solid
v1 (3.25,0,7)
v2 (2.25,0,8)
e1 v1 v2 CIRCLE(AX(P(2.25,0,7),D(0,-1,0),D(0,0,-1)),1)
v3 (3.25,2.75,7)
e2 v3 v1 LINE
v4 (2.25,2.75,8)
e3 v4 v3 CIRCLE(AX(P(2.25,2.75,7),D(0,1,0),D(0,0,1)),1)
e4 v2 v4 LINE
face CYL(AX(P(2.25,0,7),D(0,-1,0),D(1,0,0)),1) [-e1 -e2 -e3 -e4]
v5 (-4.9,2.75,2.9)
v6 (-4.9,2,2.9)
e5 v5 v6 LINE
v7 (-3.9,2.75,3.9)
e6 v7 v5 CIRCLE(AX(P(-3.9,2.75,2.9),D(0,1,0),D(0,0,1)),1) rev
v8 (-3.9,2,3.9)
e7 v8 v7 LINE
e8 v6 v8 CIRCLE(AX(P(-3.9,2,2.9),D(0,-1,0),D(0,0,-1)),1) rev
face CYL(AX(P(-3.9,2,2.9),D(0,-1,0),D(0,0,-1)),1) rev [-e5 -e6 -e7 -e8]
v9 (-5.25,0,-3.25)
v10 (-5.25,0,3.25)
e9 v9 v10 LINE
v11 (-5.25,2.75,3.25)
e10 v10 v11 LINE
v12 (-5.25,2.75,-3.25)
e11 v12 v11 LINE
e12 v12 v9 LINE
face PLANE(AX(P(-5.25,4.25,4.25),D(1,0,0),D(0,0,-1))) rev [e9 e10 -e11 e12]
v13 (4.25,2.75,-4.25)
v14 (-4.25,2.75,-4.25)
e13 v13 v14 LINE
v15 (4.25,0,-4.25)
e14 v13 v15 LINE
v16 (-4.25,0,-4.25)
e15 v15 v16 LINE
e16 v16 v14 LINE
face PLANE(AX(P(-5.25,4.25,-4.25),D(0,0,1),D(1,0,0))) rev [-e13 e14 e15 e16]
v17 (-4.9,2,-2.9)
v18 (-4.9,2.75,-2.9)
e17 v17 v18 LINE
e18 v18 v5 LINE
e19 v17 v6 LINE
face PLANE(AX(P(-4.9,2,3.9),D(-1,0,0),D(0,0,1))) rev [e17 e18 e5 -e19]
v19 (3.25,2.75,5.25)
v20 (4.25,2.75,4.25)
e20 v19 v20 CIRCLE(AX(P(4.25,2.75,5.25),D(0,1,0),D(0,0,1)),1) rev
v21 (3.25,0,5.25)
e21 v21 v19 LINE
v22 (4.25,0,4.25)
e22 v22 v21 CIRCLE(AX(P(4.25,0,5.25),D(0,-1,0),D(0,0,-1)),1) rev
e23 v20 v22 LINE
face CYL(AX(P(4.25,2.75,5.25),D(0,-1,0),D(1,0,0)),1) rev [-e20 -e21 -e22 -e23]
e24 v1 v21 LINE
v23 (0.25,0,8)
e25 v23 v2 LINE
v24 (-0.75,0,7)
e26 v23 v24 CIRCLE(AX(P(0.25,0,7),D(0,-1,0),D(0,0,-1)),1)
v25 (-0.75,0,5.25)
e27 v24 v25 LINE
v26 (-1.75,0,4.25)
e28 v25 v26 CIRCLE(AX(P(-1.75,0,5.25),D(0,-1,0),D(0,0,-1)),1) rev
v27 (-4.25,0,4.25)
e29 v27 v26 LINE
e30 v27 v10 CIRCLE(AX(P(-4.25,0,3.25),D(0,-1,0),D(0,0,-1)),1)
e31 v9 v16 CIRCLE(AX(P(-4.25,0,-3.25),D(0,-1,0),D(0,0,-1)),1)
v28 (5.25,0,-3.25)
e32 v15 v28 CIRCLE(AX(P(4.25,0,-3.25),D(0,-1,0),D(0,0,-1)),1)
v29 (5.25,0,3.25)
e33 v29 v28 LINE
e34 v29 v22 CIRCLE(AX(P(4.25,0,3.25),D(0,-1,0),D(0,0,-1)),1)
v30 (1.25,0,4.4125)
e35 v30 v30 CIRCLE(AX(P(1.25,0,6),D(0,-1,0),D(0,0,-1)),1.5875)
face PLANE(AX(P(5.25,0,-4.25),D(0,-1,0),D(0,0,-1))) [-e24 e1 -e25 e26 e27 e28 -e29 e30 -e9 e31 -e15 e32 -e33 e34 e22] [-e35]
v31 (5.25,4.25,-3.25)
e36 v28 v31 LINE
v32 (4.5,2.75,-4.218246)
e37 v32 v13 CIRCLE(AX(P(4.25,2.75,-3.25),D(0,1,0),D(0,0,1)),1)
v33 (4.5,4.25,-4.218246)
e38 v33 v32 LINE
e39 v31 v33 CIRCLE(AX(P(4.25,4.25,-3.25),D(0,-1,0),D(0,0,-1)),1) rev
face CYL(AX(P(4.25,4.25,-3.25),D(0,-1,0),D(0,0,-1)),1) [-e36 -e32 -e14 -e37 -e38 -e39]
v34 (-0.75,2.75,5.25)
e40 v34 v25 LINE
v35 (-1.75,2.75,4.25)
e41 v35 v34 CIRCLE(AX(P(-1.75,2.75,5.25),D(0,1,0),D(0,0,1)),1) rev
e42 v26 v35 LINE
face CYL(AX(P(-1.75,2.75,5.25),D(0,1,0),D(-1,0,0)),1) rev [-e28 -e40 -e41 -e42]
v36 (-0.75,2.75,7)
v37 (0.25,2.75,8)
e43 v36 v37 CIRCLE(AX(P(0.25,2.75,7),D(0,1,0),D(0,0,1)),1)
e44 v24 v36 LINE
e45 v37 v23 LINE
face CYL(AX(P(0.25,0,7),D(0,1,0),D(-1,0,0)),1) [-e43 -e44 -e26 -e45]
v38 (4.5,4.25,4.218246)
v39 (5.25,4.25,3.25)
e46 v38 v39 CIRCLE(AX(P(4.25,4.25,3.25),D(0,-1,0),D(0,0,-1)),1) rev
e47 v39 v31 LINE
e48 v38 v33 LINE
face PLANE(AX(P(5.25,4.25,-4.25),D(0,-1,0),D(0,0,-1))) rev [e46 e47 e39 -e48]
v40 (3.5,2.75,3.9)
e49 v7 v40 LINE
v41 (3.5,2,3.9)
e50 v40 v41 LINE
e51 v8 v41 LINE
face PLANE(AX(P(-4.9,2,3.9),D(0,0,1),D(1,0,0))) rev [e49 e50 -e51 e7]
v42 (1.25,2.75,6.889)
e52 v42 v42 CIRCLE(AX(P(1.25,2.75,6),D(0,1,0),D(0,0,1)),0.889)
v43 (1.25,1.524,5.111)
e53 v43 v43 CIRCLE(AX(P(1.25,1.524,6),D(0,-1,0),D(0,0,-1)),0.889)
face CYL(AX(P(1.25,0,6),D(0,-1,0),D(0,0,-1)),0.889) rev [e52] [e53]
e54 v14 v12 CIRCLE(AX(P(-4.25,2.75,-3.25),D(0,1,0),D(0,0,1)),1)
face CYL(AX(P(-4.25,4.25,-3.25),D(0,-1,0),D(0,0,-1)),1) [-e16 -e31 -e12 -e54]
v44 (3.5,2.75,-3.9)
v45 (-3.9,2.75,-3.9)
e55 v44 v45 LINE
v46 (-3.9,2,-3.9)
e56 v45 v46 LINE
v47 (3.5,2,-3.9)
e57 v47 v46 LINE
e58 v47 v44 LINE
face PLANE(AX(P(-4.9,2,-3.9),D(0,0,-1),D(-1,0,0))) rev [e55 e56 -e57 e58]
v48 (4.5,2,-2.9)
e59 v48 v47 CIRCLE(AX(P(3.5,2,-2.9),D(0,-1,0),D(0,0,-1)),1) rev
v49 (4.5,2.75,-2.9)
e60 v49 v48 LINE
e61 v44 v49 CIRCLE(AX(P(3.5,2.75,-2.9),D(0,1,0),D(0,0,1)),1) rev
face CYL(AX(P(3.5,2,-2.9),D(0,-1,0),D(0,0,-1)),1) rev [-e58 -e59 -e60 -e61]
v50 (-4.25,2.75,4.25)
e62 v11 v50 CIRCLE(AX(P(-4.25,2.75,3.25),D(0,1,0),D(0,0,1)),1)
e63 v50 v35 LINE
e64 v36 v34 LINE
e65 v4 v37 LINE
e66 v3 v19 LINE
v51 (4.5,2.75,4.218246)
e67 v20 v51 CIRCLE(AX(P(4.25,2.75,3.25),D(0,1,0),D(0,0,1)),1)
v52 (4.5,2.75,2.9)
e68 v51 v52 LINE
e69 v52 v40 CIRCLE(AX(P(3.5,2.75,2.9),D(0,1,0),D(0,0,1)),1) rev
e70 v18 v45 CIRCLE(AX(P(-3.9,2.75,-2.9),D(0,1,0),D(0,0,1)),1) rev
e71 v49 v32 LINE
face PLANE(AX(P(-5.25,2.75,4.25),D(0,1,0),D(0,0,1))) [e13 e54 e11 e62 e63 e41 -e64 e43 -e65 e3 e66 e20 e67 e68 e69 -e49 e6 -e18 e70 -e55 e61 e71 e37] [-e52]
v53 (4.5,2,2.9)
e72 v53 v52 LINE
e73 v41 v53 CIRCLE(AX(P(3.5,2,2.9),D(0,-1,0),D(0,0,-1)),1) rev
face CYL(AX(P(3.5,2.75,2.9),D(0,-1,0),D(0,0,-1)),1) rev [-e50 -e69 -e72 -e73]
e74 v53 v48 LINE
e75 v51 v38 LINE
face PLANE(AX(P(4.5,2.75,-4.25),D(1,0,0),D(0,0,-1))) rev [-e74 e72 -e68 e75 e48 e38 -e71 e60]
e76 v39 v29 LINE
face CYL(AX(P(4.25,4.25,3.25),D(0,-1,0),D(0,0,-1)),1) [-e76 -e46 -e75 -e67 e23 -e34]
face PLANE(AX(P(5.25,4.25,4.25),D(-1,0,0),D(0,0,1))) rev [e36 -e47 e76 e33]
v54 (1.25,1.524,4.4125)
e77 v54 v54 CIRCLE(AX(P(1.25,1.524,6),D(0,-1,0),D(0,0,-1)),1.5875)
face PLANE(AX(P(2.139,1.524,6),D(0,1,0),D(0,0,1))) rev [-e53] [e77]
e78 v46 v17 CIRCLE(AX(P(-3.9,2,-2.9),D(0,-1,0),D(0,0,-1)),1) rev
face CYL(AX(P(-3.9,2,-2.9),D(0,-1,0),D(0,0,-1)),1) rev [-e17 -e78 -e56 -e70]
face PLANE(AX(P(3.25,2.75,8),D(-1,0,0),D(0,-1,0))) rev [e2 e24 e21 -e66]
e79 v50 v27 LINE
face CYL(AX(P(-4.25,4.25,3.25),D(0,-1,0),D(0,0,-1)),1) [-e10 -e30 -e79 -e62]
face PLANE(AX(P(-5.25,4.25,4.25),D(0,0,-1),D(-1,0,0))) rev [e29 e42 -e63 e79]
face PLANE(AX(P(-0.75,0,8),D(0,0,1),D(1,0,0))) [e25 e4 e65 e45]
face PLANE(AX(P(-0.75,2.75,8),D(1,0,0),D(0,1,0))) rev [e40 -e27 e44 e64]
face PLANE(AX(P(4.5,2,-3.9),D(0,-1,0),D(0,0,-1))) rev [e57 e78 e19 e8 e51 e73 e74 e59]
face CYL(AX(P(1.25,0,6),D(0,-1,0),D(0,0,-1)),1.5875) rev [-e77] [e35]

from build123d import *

# Parameters (mm, degrees)
SKETCH1_W                                      = 10.5
SKETCH1_H                                      = 8.5
EXTRUDE1_DEPTH                                 = 4.25
SKETCH3_W                                      = 9.75
SKETCH3_H                                      = 8.5
EXTRUDE4_DEPTH                                 = 1.5
SKETCH4_W                                      = 9.4
SKETCH4_H                                      = 7.8
EXTRUDE5_DEPTH                                 = 0.75
SKETCH5_W                                      = 4
SKETCH5_H                                      = 2.75
EXTRUDE6_DEPTH                                 = 3.75
CBORE_FOR_0_SOCKET_HEAD_CAP_SCREW1_D           = 1.778
CBORE_FOR_0_SOCKET_HEAD_CAP_SCREW1_CBORE_D     = 3.175
CBORE_FOR_0_SOCKET_HEAD_CAP_SCREW1_CBORE_DEPTH = 1.524
FILLET1_R                                      = 1


with BuildPart() as part:
    # Sketch1 → Extrude1 (new body)
    with BuildSketch(Plane(origin=(0, 0, 0), x_dir=(1, 0, 0), z_dir=(0, 1, 0))):
        Rectangle(SKETCH1_W, SKETCH1_H)
    extrude(amount=EXTRUDE1_DEPTH)

    # Sketch3 → Extrude4 (cut)
    with BuildSketch(Plane(origin=(0, 4.25, 0), x_dir=(1, 0, 0), z_dir=(0, 1, 0))):
        with Locations((-0.375, 0)):
            Rectangle(SKETCH3_W, SKETCH3_H)
    extrude(amount=-EXTRUDE4_DEPTH, mode=Mode.SUBTRACT)

    # Sketch4 → Extrude5 (cut)
    with BuildSketch(Plane(origin=(0, 2.75, 0), x_dir=(1, 0, 0), z_dir=(0, 1, 0))):
        with Locations((-0.2, 0)):
            Rectangle(SKETCH4_W, SKETCH4_H)
    extrude(amount=-EXTRUDE5_DEPTH, mode=Mode.SUBTRACT)

    # Sketch5 → Extrude6 (add)
    with BuildSketch(Plane.XY.offset(4.25)):
        with Locations((1.25, 1.375)):
            Rectangle(SKETCH5_W, SKETCH5_H)
    extrude(amount=EXTRUDE6_DEPTH)

    # CBORE for #0 Socket Head Cap Screw1 (through all)
    with Locations(Plane(origin=(1.25, 0, 6), x_dir=(0, 0, -1), z_dir=(0, -1, 0))):
        with Locations((0, 0)):
            CounterBoreHole(CBORE_FOR_0_SOCKET_HEAD_CAP_SCREW1_D / 2, CBORE_FOR_0_SOCKET_HEAD_CAP_SCREW1_CBORE_D / 2, CBORE_FOR_0_SOCKET_HEAD_CAP_SCREW1_CBORE_DEPTH)

    # Fillet1
    # the kernel refuses this fillet: 1 mm, written as the material it adds along each edge
    with BuildSketch(Plane(origin=(3.25, 2.75, 4.25), x_dir=(0, 0, 1), z_dir=(0, -1, 0))) as fillet1_piece_1:
        with BuildLine():
            CenterArc((FILLET1_R, -FILLET1_R), FILLET1_R, 90, 90)
            Line((0, -FILLET1_R), (0, 0))
            Line((0, 0), (FILLET1_R, 0))
        make_face()
    extrude(amount=2.75)
    with BuildSketch(Plane(origin=(-0.75, 0, 4.25), x_dir=(-1, 0, 0), z_dir=(0, 1, 0))) as fillet1_piece_2:
        with BuildLine():
            CenterArc((FILLET1_R, FILLET1_R), FILLET1_R, 180, 90)
            Line((0, FILLET1_R), (0, 0))
            Line((0, 0), (FILLET1_R, 0))
        make_face()
    extrude(amount=2.75)
    with BuildSketch(Plane(origin=(4.5, 2.75, -3.9), x_dir=(0, 0, 1), z_dir=(0, -1, 0)), Plane(origin=(-4.9, 2.75, -3.9), x_dir=(1, 0, 0), z_dir=(0, -1, 0)), Plane(origin=(-4.9, 2.75, 3.9), x_dir=(0, 0, -1), z_dir=(0, -1, 0))) as fillet1_piece_3:
        with BuildLine():
            CenterArc((FILLET1_R, FILLET1_R), FILLET1_R, 180, 90)
            Line((0, FILLET1_R), (0, 0))
            Line((0, 0), (FILLET1_R, 0))
        make_face()
    extrude(amount=0.75)
    with BuildSketch(Plane(origin=(4.5, 2.75, 3.9), x_dir=(0, 0, -1), z_dir=(0, -1, 0))) as fillet1_piece_4:
        with BuildLine():
            CenterArc((FILLET1_R, -FILLET1_R), FILLET1_R, 90, 90)
            Line((0, -FILLET1_R), (0, 0))
            Line((0, 0), (FILLET1_R, 0))
        make_face()
    extrude(amount=0.75)
    # the kernel refuses this fillet: 1 mm, written as the material it takes off along each edge
    with BuildSketch(Plane(origin=(5.25, -2.5, -4.25), x_dir=(-1, 0, 0), z_dir=(0, 1, 0)), Plane(origin=(5.25, -2.5, 4.25), x_dir=(0, 0, -1), z_dir=(0, 1, 0))) as fillet1_2_piece_1:
        with BuildLine():
            CenterArc((FILLET1_R, FILLET1_R), FILLET1_R, 180, 90)
            Line((0, FILLET1_R), (0, 0))
            Line((0, 0), (FILLET1_R, 0))
        make_face()
    extrude(amount=9.25, mode=Mode.SUBTRACT)
    with BuildSketch(Plane(origin=(3.25, 5.25, 8), x_dir=(0, 0, -1), z_dir=(0, -1, 0))) as fillet1_2_piece_2:
        with BuildLine():
            CenterArc((FILLET1_R, -FILLET1_R), FILLET1_R, 90, 90)
            Line((0, -FILLET1_R), (0, 0))
            Line((0, 0), (FILLET1_R, 0))
        make_face()
    extrude(amount=7.75, mode=Mode.SUBTRACT)
    with BuildSketch(Plane(origin=(-0.75, -2.5, 8), x_dir=(1, 0, 0), z_dir=(0, 1, 0)), Plane(origin=(-5.25, -2.5, -4.25), x_dir=(0, 0, 1), z_dir=(0, 1, 0)), Plane(origin=(-5.25, -2.5, 4.25), x_dir=(1, 0, 0), z_dir=(0, 1, 0))) as fillet1_2_piece_3:
        with BuildLine():
            CenterArc((FILLET1_R, FILLET1_R), FILLET1_R, 180, 90)
            Line((0, FILLET1_R), (0, 0))
            Line((0, 0), (FILLET1_R, 0))
        make_face()
    extrude(amount=7.75, mode=Mode.SUBTRACT)


solid = part.part
